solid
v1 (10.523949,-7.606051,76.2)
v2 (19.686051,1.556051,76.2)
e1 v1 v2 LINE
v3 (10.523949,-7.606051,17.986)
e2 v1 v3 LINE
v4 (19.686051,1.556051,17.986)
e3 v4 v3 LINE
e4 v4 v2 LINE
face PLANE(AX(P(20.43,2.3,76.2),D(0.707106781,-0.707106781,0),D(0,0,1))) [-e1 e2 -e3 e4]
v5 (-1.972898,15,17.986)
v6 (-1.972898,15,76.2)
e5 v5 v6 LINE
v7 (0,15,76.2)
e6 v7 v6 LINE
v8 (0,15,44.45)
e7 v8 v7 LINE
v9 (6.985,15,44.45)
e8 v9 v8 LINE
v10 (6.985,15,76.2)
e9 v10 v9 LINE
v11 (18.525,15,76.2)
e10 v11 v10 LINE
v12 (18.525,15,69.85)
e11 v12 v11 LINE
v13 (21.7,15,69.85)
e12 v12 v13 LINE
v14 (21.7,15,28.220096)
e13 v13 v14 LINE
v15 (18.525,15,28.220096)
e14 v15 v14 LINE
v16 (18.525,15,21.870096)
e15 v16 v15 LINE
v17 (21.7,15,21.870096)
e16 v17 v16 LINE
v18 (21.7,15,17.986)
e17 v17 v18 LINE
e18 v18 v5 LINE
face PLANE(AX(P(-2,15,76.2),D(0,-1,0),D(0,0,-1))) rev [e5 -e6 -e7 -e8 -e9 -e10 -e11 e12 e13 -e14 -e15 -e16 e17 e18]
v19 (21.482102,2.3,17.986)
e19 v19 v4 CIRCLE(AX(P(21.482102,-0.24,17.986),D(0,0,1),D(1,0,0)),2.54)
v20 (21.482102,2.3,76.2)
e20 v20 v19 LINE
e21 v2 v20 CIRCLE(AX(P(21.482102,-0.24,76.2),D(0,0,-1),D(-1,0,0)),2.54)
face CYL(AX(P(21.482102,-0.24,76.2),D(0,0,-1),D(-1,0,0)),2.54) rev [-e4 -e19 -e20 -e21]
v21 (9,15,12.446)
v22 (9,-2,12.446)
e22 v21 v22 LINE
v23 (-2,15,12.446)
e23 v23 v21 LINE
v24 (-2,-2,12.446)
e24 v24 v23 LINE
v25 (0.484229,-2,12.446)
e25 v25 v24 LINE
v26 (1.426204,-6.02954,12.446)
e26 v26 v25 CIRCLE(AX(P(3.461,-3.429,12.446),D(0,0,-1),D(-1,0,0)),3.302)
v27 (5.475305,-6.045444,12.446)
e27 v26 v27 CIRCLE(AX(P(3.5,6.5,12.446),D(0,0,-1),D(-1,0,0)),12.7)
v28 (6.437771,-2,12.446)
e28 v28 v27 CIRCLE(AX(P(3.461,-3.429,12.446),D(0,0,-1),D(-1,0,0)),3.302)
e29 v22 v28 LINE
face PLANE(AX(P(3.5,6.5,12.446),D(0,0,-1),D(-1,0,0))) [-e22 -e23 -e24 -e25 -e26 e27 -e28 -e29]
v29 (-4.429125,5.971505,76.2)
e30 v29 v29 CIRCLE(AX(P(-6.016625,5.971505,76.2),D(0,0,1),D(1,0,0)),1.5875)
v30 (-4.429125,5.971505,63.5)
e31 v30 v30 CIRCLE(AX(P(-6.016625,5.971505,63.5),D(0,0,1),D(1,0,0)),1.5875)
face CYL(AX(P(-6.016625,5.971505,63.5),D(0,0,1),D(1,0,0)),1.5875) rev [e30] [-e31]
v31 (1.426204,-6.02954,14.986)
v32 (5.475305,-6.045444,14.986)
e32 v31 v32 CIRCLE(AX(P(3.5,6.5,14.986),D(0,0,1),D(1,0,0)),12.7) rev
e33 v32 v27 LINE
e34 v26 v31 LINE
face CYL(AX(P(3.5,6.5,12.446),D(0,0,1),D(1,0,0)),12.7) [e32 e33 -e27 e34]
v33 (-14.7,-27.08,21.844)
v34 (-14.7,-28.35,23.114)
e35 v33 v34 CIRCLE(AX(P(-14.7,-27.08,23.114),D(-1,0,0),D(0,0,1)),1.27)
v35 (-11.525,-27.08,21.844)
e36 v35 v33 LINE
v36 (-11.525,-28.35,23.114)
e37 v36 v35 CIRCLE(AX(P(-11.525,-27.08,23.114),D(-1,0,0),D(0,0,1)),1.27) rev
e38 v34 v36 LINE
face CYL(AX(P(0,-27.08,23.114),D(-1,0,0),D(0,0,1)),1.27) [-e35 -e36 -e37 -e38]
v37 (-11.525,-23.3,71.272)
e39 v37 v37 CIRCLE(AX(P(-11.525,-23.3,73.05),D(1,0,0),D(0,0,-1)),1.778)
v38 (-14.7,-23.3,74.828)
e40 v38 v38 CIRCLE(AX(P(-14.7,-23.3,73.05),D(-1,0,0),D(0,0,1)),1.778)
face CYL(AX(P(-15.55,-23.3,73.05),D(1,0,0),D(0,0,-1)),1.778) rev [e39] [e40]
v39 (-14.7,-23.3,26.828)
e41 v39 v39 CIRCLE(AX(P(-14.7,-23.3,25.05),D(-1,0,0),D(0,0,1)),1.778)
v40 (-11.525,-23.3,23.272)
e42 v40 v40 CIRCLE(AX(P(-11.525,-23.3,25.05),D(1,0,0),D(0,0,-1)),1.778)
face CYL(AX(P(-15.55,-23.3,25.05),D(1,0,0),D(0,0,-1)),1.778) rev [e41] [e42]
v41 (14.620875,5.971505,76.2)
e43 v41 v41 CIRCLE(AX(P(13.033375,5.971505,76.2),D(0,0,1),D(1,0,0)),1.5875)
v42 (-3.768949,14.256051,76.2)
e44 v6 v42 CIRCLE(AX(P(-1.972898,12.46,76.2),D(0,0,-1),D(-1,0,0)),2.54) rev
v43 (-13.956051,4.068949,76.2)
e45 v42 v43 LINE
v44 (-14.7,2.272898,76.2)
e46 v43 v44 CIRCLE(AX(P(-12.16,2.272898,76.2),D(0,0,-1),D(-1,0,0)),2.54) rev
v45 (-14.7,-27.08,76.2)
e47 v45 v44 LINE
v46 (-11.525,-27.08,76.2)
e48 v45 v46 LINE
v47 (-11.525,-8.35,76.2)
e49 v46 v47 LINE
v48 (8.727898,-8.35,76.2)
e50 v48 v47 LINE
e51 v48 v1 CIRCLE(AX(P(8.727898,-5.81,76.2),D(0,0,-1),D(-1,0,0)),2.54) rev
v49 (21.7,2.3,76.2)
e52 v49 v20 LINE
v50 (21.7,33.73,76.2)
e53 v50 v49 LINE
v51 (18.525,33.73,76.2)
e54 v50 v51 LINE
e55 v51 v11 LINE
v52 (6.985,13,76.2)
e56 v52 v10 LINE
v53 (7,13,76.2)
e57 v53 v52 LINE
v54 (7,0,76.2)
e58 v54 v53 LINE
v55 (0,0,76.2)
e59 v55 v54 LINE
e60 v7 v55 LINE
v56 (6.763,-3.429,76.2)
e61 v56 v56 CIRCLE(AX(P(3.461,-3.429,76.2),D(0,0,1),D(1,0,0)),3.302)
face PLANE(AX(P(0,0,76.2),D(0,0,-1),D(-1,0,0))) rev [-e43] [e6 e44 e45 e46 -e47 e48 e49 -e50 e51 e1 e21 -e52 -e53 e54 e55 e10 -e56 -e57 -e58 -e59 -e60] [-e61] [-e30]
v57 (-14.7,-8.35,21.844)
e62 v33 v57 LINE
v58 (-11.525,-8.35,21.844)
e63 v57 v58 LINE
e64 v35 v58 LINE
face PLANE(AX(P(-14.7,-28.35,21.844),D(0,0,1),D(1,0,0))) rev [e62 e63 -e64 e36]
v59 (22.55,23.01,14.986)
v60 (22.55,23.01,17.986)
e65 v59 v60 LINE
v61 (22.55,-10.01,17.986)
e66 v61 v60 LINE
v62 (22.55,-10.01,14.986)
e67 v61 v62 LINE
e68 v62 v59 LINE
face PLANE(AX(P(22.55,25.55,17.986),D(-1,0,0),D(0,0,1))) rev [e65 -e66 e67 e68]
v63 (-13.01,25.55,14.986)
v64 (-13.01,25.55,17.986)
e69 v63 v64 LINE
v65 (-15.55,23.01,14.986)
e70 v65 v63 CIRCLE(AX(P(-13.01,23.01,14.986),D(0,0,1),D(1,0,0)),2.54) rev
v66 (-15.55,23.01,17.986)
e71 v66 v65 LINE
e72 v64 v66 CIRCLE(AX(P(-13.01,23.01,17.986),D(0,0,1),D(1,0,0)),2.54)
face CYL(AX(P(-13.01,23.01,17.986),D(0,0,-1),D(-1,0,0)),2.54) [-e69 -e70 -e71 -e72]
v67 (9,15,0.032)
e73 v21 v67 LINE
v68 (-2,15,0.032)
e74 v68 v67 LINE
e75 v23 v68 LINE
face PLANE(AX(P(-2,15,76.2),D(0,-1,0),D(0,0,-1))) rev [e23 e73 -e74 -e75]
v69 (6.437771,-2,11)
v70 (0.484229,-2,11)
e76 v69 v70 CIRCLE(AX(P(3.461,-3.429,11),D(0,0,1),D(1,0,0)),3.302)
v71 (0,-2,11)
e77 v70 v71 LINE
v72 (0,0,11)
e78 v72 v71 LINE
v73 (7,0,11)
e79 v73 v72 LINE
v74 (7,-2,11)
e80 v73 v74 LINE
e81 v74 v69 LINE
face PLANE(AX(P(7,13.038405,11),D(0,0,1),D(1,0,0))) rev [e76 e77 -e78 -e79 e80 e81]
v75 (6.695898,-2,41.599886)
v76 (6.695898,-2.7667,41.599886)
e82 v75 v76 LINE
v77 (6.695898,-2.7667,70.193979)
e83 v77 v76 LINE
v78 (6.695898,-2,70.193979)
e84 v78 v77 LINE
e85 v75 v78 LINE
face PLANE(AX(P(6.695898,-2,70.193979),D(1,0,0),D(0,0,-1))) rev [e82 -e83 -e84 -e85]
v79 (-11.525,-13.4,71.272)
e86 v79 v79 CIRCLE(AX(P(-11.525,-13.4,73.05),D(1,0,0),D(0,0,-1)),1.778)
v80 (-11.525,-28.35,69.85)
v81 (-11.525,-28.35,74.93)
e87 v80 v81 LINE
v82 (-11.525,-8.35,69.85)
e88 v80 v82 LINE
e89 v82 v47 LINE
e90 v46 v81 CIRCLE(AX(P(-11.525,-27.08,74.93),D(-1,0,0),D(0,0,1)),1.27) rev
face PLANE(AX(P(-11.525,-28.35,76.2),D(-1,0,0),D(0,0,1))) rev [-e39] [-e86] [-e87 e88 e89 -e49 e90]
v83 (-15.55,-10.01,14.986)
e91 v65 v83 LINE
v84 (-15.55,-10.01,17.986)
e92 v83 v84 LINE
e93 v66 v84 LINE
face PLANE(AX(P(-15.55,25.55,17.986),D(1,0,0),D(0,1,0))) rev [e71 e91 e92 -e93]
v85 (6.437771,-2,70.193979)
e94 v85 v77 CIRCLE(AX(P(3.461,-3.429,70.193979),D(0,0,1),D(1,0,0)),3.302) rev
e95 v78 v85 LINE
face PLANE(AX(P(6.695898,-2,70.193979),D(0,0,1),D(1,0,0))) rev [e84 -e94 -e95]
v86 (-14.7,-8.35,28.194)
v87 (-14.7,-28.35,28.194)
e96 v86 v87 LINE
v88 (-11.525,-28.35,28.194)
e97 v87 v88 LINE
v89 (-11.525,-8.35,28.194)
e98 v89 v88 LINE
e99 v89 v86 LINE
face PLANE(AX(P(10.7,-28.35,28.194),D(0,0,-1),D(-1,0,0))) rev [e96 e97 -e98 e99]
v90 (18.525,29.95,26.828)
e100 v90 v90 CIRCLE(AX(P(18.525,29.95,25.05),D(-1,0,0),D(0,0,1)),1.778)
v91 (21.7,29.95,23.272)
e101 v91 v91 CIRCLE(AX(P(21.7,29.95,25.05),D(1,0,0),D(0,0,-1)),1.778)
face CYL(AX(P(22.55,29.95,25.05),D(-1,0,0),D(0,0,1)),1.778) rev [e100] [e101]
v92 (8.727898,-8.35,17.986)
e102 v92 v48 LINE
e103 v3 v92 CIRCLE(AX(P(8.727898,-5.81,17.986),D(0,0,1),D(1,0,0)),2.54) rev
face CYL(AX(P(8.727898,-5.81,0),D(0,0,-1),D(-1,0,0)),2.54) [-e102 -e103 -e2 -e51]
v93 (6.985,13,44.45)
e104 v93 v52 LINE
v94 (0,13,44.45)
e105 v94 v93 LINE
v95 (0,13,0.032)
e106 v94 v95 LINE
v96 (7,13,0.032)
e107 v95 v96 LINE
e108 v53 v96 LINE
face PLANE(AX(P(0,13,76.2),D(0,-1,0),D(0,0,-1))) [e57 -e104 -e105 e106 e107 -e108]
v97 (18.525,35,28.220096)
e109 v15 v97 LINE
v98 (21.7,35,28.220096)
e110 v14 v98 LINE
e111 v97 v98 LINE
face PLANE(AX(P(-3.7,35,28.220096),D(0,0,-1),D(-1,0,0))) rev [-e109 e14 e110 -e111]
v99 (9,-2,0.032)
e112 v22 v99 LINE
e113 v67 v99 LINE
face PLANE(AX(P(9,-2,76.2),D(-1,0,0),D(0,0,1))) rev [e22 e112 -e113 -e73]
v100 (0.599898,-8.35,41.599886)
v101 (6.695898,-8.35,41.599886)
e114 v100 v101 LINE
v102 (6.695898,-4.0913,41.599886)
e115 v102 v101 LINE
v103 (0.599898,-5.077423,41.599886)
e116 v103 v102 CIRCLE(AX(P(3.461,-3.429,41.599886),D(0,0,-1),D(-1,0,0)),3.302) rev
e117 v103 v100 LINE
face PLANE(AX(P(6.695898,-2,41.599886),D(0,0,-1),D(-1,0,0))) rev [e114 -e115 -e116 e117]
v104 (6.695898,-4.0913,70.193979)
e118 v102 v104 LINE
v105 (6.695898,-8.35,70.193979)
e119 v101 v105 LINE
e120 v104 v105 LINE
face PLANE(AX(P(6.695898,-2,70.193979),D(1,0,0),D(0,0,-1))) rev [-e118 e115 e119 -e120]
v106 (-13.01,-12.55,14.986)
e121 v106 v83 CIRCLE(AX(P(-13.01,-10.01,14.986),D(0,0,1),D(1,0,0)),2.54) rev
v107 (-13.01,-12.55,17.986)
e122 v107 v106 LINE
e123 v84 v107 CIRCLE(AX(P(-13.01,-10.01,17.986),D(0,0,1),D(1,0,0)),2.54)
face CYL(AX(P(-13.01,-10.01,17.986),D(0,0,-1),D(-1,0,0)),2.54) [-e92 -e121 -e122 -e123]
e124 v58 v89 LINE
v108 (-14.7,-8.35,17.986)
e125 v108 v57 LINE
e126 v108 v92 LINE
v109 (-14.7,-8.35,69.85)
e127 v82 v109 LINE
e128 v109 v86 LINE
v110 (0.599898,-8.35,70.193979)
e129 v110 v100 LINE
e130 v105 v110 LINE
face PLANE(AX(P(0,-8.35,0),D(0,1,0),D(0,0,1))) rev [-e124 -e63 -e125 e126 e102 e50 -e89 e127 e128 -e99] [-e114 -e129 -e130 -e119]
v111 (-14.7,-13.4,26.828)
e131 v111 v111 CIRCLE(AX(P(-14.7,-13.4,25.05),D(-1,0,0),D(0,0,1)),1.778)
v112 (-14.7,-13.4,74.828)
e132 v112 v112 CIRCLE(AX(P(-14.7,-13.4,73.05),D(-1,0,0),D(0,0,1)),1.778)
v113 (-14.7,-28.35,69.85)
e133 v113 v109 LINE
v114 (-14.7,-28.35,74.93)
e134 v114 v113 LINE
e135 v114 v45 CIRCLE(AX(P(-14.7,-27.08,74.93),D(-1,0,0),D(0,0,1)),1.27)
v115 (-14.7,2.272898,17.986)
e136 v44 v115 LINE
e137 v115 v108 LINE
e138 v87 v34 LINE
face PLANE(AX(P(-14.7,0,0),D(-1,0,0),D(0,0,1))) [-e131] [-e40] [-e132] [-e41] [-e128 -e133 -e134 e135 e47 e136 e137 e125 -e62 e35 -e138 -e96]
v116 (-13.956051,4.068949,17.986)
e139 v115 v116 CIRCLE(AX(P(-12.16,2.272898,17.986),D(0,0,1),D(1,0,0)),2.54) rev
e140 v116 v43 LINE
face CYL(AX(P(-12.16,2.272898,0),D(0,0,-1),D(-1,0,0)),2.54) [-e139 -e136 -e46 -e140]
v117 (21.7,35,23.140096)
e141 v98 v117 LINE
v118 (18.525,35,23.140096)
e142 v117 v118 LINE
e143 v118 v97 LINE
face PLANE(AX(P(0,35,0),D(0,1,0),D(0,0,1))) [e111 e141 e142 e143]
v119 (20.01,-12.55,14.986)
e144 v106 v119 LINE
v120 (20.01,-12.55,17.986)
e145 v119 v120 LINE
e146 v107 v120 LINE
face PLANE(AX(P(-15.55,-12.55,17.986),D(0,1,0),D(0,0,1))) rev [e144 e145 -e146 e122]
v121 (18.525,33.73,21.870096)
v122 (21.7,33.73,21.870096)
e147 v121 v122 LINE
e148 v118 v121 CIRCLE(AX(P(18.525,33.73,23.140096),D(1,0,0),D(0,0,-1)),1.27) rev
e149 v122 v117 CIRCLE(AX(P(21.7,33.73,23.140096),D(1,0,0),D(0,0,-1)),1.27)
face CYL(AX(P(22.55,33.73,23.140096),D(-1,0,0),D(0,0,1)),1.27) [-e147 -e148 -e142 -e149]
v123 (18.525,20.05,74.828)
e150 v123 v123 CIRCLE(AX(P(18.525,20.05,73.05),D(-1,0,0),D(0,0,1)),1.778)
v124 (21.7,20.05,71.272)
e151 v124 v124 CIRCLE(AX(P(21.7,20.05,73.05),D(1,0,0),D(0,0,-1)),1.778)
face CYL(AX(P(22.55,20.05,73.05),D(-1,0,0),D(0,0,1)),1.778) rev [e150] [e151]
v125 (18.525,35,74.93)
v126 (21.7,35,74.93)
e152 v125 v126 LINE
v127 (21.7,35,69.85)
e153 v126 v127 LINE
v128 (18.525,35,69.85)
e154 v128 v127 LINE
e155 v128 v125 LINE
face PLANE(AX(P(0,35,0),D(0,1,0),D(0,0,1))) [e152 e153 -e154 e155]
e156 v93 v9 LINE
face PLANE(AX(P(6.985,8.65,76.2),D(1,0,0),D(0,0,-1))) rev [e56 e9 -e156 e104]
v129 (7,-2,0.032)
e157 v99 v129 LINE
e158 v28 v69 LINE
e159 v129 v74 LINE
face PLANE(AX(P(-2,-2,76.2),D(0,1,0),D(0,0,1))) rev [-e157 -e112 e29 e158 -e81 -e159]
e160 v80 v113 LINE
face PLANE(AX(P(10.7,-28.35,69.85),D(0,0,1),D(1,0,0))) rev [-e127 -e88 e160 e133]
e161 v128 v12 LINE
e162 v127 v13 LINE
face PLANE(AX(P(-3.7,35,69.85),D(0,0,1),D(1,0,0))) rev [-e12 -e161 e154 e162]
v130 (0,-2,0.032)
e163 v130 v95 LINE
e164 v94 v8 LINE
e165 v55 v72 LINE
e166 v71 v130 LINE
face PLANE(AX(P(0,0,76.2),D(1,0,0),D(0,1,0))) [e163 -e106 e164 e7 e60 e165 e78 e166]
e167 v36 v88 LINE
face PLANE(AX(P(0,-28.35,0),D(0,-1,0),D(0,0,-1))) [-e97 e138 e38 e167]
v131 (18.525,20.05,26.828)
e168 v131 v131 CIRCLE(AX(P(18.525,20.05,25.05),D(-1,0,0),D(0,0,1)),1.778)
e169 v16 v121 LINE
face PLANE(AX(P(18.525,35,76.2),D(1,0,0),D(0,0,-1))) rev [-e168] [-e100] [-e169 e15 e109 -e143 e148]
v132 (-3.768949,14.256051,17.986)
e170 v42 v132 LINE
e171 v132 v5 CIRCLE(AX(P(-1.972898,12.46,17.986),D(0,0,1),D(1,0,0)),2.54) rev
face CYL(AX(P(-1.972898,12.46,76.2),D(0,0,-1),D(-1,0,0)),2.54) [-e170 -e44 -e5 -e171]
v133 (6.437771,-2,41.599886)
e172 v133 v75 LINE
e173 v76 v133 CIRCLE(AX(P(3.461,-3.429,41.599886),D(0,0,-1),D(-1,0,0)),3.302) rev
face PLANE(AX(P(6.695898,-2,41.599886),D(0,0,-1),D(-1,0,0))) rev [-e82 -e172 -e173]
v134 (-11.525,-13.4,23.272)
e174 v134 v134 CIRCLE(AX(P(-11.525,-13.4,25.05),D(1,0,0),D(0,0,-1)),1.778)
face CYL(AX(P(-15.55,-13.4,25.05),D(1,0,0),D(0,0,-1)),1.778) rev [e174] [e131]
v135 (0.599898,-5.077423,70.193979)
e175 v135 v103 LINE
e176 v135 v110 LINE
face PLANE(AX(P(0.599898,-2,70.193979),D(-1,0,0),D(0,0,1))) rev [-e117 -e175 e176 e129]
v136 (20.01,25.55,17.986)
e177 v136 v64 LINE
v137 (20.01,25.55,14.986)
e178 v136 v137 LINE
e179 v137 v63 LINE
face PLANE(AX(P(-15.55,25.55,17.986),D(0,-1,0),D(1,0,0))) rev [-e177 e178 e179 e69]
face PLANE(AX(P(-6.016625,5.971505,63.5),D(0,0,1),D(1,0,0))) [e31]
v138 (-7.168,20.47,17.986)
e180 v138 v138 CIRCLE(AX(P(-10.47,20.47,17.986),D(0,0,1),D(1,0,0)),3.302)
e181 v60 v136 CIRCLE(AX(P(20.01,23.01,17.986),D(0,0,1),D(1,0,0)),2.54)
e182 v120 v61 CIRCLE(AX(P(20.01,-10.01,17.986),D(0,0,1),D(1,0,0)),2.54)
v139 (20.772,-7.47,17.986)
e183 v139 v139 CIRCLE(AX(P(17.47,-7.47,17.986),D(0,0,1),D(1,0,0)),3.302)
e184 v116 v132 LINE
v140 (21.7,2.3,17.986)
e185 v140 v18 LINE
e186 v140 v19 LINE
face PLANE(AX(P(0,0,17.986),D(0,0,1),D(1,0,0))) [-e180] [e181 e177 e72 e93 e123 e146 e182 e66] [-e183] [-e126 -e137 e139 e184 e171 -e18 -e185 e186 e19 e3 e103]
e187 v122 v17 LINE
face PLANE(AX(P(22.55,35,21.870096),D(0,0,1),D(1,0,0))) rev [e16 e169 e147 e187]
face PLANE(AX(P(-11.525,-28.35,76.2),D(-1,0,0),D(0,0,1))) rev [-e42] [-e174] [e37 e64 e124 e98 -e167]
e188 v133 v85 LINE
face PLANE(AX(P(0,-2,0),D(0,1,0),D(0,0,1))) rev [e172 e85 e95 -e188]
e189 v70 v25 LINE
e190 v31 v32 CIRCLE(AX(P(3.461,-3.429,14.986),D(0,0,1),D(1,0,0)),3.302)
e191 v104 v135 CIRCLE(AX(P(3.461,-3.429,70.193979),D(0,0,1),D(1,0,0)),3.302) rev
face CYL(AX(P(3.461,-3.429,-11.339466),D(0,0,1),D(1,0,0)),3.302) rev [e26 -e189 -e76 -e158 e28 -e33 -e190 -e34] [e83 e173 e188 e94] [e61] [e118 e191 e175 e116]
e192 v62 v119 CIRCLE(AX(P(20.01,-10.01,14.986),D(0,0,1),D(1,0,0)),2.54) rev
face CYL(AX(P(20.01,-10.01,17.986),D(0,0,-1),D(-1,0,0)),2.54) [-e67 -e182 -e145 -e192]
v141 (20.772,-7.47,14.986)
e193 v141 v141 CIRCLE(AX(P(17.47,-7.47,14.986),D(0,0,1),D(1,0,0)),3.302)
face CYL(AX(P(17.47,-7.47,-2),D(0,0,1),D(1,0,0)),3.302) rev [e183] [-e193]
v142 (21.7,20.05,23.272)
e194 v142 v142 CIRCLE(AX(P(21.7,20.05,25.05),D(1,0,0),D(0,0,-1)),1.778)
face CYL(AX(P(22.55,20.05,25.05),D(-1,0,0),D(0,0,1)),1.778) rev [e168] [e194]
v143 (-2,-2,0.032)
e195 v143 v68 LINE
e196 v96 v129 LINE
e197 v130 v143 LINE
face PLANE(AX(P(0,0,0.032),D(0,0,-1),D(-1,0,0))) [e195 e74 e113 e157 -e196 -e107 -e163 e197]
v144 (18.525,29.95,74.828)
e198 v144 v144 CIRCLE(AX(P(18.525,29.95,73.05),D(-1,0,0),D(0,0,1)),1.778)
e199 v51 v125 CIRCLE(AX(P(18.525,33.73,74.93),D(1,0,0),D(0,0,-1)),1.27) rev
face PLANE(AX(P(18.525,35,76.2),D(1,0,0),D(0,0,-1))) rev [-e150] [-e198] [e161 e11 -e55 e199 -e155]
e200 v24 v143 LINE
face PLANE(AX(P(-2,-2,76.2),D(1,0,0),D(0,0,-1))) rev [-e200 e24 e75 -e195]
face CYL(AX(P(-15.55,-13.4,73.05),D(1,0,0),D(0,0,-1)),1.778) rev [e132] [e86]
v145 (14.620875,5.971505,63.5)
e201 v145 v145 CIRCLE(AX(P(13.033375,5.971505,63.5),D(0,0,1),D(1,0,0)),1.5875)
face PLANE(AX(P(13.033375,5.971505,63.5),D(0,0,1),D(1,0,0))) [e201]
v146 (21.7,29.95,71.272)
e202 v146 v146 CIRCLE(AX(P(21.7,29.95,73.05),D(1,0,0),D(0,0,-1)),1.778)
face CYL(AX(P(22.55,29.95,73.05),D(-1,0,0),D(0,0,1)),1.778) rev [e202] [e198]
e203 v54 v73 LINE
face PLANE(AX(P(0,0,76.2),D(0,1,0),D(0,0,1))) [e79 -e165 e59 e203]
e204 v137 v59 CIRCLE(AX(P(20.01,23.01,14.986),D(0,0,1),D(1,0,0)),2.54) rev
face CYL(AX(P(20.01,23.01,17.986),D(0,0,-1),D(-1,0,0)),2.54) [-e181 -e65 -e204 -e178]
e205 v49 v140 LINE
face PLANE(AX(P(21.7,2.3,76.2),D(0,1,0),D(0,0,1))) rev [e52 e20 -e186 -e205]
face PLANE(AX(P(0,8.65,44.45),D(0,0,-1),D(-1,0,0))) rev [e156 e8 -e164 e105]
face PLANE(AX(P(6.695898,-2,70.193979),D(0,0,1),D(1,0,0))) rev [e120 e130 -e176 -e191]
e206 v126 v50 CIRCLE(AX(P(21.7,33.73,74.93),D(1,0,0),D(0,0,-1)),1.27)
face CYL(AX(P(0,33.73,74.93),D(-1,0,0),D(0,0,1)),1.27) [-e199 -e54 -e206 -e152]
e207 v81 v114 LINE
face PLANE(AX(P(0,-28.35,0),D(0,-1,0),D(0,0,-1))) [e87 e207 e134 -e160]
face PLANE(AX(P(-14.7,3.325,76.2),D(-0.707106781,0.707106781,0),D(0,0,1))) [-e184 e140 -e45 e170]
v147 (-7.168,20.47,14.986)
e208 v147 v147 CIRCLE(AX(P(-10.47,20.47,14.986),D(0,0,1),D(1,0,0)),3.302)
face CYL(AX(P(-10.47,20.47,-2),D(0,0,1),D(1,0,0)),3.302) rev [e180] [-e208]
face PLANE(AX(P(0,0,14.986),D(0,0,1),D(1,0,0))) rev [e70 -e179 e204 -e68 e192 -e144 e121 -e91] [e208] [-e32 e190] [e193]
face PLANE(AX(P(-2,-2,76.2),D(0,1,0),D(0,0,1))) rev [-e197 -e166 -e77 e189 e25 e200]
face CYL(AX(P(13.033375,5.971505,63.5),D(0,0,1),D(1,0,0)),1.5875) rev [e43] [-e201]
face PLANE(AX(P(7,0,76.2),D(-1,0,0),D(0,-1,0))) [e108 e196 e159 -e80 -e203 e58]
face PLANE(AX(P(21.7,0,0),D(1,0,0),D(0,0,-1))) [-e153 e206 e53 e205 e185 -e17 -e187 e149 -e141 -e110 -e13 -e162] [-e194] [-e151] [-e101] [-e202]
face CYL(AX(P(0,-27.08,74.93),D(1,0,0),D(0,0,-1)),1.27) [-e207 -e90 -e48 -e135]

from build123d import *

# Parameters (mm, degrees)
SKETCH1_W           = 11
SKETCH1_H           = 17
SKETCH1_W_2         = 7
SKETCH1_H_2         = 13
BOSS_EXTRUDE1_DEPTH = 76.2
SKETCH2_W           = 11
SKETCH2_H           = 17
BOSS_EXTRUDE2_DEPTH = 2
SKETCH3_W           = 7
SKETCH3_H           = 11
CUT_EXTRUDE1_DEPTH  = 2
SKETCH4_W           = 38.1
SKETCH4_H           = 38.1
SKETCH4_W_2         = 11
SKETCH4_H_2         = 17
BOSS_EXTRUDE3_DEPTH = 3
SKETCH5_R           = 12.7
SKETCH5_W           = 11
SKETCH5_H           = 17
BOSS_EXTRUDE4_DEPTH = 2.54
SKETCH6_W           = 11
SKETCH6_H           = 58.214
BOSS_EXTRUDE5_DEPTH = 6.35
CUT_EXTRUDE2_REACH  = 87.303
SKETCH7_R           = 3.302
SKETCH8_W           = 6.985
SKETCH8_H           = 31.75
CUT_EXTRUDE3_DEPTH  = 6.35
SKETCH9_W           = 58.42
SKETCH9_H           = 12.7
BOSS_EXTRUDE6_DEPTH = 12.7
SKETCH10_W          = 3.175
SKETCH10_H          = 58.214
BOSS_EXTRUDE7_DEPTH = 20
SKETCH11_R          = 1.778
SKETCH11_W          = 3.884096392
SKETCH11_H          = 20
CUT_EXTRUDE4_DEPTH  = 91.512682122
FILLET1_R           = 1.27
CHAMFER1_SIZE       = 11.43
FILLET3_R           = 2.54
SKETCH12_W          = 58.214
SKETCH12_H          = 11.675
BOSS_EXTRUDE8_DEPTH = 12.7
SKETCH13_W          = 3.175
SKETCH13_H          = 54.356
BOSS_EXTRUDE9_DEPTH = 20
CHAMFER3_SIZE       = 12.7
FILLET4_R           = 2.54
SKETCH14_W          = 6.096
SKETCH14_H          = 28.594092226
CUT_EXTRUDE5_DEPTH  = 6.35
SKETCH15_R          = 1.778
CUT_EXTRUDE6_DEPTH  = 91.512682122
FILLET5_R           = 1.27
SKETCH16_R          = 1.5875
CUT_EXTRUDE7_DEPTH  = 12.7
FILLET6_R           = 2.54
SKETCH17_R          = 3.302
CUT_EXTRUDE8_DEPTH  = 72.570750283
SKETCH19_W          = 11
SKETCH19_H          = 17
CUT_EXTRUDE9_DEPTH  = 2.032
SKETCH21_W          = 41.629903608
SKETCH21_H          = 20
CUT_EXTRUDE10_DEPTH = 25.4
SKETCH22_W          = 41.656
SKETCH22_H          = 20
CUT_EXTRUDE11_DEPTH = 25.4


with BuildPart() as part:
    # Sketch1 → Boss-Extrude1 (new body)
    with BuildSketch(Plane.XY):
        with Locations((3.5, 6.5)):
            Rectangle(SKETCH1_W, SKETCH1_H)
        with Locations((3.5, 6.5)):
            Rectangle(SKETCH1_W_2, SKETCH1_H_2, mode=Mode.SUBTRACT)
    extrude(amount=BOSS_EXTRUDE1_DEPTH)

    # Sketch2 → Boss-Extrude2 (add)
    with BuildSketch(Plane(origin=(0, 0, 0), x_dir=(-1, 0, 0), z_dir=(0, 0, -1))):
        with Locations((-3.5, 6.5)):
            Rectangle(SKETCH2_W, SKETCH2_H)
    extrude(amount=BOSS_EXTRUDE2_DEPTH)

    # Sketch3 → Cut-Extrude1 (cut)
    with BuildSketch(Plane(origin=(0, -2, 0), x_dir=(-1, 0, 0), z_dir=(0, -1, 0))):
        with Locations((-3.5, -5.5)):
            Rectangle(SKETCH3_W, SKETCH3_H)
    extrude(amount=-CUT_EXTRUDE1_DEPTH, mode=Mode.SUBTRACT)

    # Sketch4 → Boss-Extrude3 (add)
    with BuildSketch(Plane.XY.offset(14.986)):
        with Locations((3.5, 6.5)):
            Rectangle(SKETCH4_W, SKETCH4_H)
        with Locations((3.5, 6.5)):
            Rectangle(SKETCH4_W_2, SKETCH4_H_2, mode=Mode.SUBTRACT)
    extrude(amount=BOSS_EXTRUDE3_DEPTH)

    # Sketch5 → Boss-Extrude4 (add)
    with BuildSketch(Plane(origin=(0, 0, 14.986), x_dir=(-1, 0, 0), z_dir=(0, 0, -1))):
        with Locations(Location((-3.5, 6.5, 0), (0, 0, 180))):
            Circle(SKETCH5_R)
        with Locations((-3.5, 6.5)):
            Rectangle(SKETCH5_W, SKETCH5_H, mode=Mode.SUBTRACT)
    extrude(amount=BOSS_EXTRUDE4_DEPTH)

    # Sketch6 → Boss-Extrude5 (add)
    with BuildSketch(Plane.XZ.offset(2)):
        with Locations((3.5, 47.093)):
            Rectangle(SKETCH6_W, SKETCH6_H)
    extrude(amount=BOSS_EXTRUDE5_DEPTH)

    # Cut-Extrude2: up to this face of the body (flat: up to its plane)
    cut_extrude2_end = Plane(part.part.faces().sort_by_distance((3.5, 6.5, -2))[0])
    # Sketch7 → Cut-Extrude2 (cut, up to the picked face)
    with BuildSketch(Plane.XY.offset(76.2), mode=Mode.PRIVATE) as cut_extrude2_sk1:
        with Locations((3.461, -3.429)):
            Circle(SKETCH7_R)
    cut_extrude2_tool1 = split(extrude(cut_extrude2_sk1.sketch, amount=-CUT_EXTRUDE2_REACH, mode=Mode.PRIVATE), bisect_by=cut_extrude2_end, keep=Keep.BOTH, mode=Mode.PRIVATE)
    add(cut_extrude2_tool1.solids().sort_by(Axis((3.461, -3.429, 76.2), (0, 0, -1)))[0], mode=Mode.SUBTRACT)

    # Sketch8 → Cut-Extrude3 (cut)
    with BuildSketch(Plane(origin=(0, 15, 0), x_dir=(1, 0, 0), z_dir=(0, 1, 0))):
        with Locations((3.4925, -60.325)):
            Rectangle(SKETCH8_W, SKETCH8_H)
    extrude(amount=-CUT_EXTRUDE3_DEPTH, mode=Mode.SUBTRACT)

    # Sketch9 → Boss-Extrude6 (add)
    with BuildSketch(Plane(origin=(9, 0, 0), x_dir=(0, 0, -1), z_dir=(1, 0, 0))):
        with Locations((-46.99, 8.65)):
            Rectangle(SKETCH9_W, SKETCH9_H)
    extrude(amount=BOSS_EXTRUDE6_DEPTH)

    # Sketch10 → Boss-Extrude7 (add)
    with BuildSketch(Plane(origin=(0, 15, 0), x_dir=(1, 0, 0), z_dir=(0, 1, 0))):
        with Locations((20.1125, -47.093)):
            Rectangle(SKETCH10_W, SKETCH10_H)
    extrude(amount=BOSS_EXTRUDE7_DEPTH)

    # Sketch11 → Cut-Extrude4 (cut, through all)
    with BuildSketch(Plane.ZY.offset(-18.525)):
        with Locations((25.05, 29.95)):
            Circle(SKETCH11_R)
        with Locations((25.05, 20.05)):
            Circle(SKETCH11_R)
        with Locations((73.05, 29.95)):
            Circle(SKETCH11_R)
        with Locations((73.05, 20.05)):
            Circle(SKETCH11_R)
        with Locations((19.928048196, 25)):
            Rectangle(SKETCH11_W, SKETCH11_H)
    extrude(amount=-CUT_EXTRUDE4_DEPTH, mode=Mode.SUBTRACT)

    # Fillet1
    fillet1_edges = [part.edges().sort_by_distance(p)[0] for p in [
        (20.1125, 35, 76.2),
        (20.1125, 35, 21.870096392),
    ]]
    fillet(fillet1_edges, radius=FILLET1_R)

    # Chamfer1
    # the kernel refuses this chamfer: 11.43 mm, written as the material it adds along each edge
    with BuildSketch(Plane(origin=(9, 2.3, 17.986), x_dir=(0.9996219169112968, 0.027495876610586382, 0), z_dir=(0, 0, 1))) as chamfer1_piece_1_section:
        Polygon((CHAMFER1_SIZE * 0.999621916911, -CHAMFER1_SIZE * 0.0274958766106), (-CHAMFER1_SIZE * 0.0274958766106, -CHAMFER1_SIZE * 0.999621916911), (0, 0), align=None)
    chamfer1_piece_1 = extrude(amount=58.214, mode=Mode.PRIVATE)
    chamfer1_piece_1 = split(chamfer1_piece_1, bisect_by=Plane(origin=(13.789958752, -8.35, 47.093), z_dir=(0, 1, 0)), keep=Keep.TOP, mode=Mode.PRIVATE)
    add(chamfer1_piece_1)

    # Fillet3
    fillet3_edges = [part.edges().sort_by_distance(p)[0] for p in [
        (20.43, 2.3, 47.093),
        (9.78, -8.35, 47.093),
    ]]
    fillet(fillet3_edges, radius=FILLET3_R)

    # Sketch12 → Boss-Extrude8 (add)
    with BuildSketch(Plane.ZY.offset(2)):
        with Locations((47.093, -2.5125)):
            Rectangle(SKETCH12_W, SKETCH12_H)
    extrude(amount=BOSS_EXTRUDE8_DEPTH)

    # Sketch13 → Boss-Extrude9 (add)
    with BuildSketch(Plane.XZ.offset(8.35)):
        with Locations((-13.1125, 49.022)):
            Rectangle(SKETCH13_W, SKETCH13_H)
    extrude(amount=BOSS_EXTRUDE9_DEPTH)

    # Chamfer3
    # the kernel refuses this chamfer: 12.7 mm, written as the material it adds along each edge
    with BuildSketch(Plane(origin=(-2, 3.325, 17.986), x_dir=(0.027495876610586365, 0.9996219169112966, 0), z_dir=(0, 0, 1))) as chamfer3_piece_1_section:
        Polygon((CHAMFER3_SIZE * 0.999621916911, CHAMFER3_SIZE * 0.0274958766106), (-CHAMFER3_SIZE * 0.0274958766106, CHAMFER3_SIZE * 0.999621916911), (0, 0), align=None)
    chamfer3_piece_1 = extrude(amount=58.214, mode=Mode.PRIVATE)
    chamfer3_piece_1 = split(chamfer3_piece_1, bisect_by=Plane(origin=(-6.232956887, 15, 47.093), z_dir=(0, -1, 0)), keep=Keep.TOP, mode=Mode.PRIVATE)
    chamfer3_piece_1 = split(chamfer3_piece_1, bisect_by=Plane(origin=(-14.7, 7.408033371, 47.093), z_dir=(1, 0, 0)), keep=Keep.TOP, mode=Mode.PRIVATE)
    add(chamfer3_piece_1)

    # Fillet4
    fillet4_edges = [part.edges().sort_by_distance(p)[0] for p in [
        (-14.7, 3.325, 47.093),
        (-3.025, 15, 47.093),
    ]]
    fillet(fillet4_edges, radius=FILLET4_R)

    # Sketch14 → Cut-Extrude5 (cut)
    with BuildSketch(Plane.XZ.offset(8.35)):
        with Locations((3.647897552, 55.896932406)):
            Rectangle(SKETCH14_W, SKETCH14_H)
    extrude(amount=-CUT_EXTRUDE5_DEPTH, mode=Mode.SUBTRACT)

    # Sketch15 → Cut-Extrude6 (cut, through all)
    with BuildSketch(Plane(origin=(-11.525, 0, 0), x_dir=(0, 0, -1), z_dir=(1, 0, 0))):
        with Locations((-73.05, -13.4)):
            Circle(SKETCH15_R)
        with Locations((-73.05, -23.3)):
            Circle(SKETCH15_R)
        with Locations((-25.05, -13.4)):
            Circle(SKETCH15_R)
        with Locations((-25.05, -23.3)):
            Circle(SKETCH15_R)
    extrude(amount=-CUT_EXTRUDE6_DEPTH, mode=Mode.SUBTRACT)

    # Fillet5
    fillet5_edges = [part.edges().sort_by_distance(p)[0] for p in [
        (-13.1125, -28.35, 21.844),
        (-13.1125, -28.35, 76.2),
    ]]
    fillet(fillet5_edges, radius=FILLET5_R)

    # Sketch16 → Cut-Extrude7 (cut)
    with BuildSketch(Plane.XY.offset(76.2)):
        with Locations((-6.016625, 5.971505071)):
            Circle(SKETCH16_R)
        with Locations((13.033375, 5.971505071)):
            Circle(SKETCH16_R)
    extrude(amount=-CUT_EXTRUDE7_DEPTH, mode=Mode.SUBTRACT)

    # Fillet6
    fillet6_edges = [part.edges().sort_by_distance(p)[0] for p in [
        (-15.55, 25.55, 16.486),
        (-15.55, -12.55, 16.486),
        (22.55, -12.55, 16.486),
        (22.55, 25.55, 16.486),
    ]]
    fillet(fillet6_edges, radius=FILLET6_R)

    # Sketch17 → Cut-Extrude8 (cut, through all)
    with BuildSketch(Plane.XY.offset(17.986)):
        with Locations((-10.47, 20.47)):
            Circle(SKETCH17_R)
        with Locations((17.47, -7.47)):
            Circle(SKETCH17_R)
    extrude(amount=-CUT_EXTRUDE8_DEPTH, mode=Mode.SUBTRACT)

    # Sketch19 → Cut-Extrude9 (cut)
    with BuildSketch(Plane(origin=(0, 0, -2), x_dir=(-1, 0, 0), z_dir=(0, 0, -1))):
        with Locations((-3.5, 6.5)):
            Rectangle(SKETCH19_W, SKETCH19_H)
    extrude(amount=-CUT_EXTRUDE9_DEPTH, mode=Mode.SUBTRACT)

    # Sketch21 → Cut-Extrude10 (cut)
    with BuildSketch(Plane(origin=(21.7, 0, 0), x_dir=(0, 0, -1), z_dir=(1, 0, 0))):
        with Locations((-49.035048196, 25)):
            Rectangle(SKETCH21_W, SKETCH21_H)
    extrude(amount=-CUT_EXTRUDE10_DEPTH, mode=Mode.SUBTRACT)

    # Sketch22 → Cut-Extrude11 (cut)
    with BuildSketch(Plane.ZY.offset(14.7)):
        with Locations((49.022, -18.35)):
            Rectangle(SKETCH22_W, SKETCH22_H)
    extrude(amount=-CUT_EXTRUDE11_DEPTH, mode=Mode.SUBTRACT)


solid = part.part
